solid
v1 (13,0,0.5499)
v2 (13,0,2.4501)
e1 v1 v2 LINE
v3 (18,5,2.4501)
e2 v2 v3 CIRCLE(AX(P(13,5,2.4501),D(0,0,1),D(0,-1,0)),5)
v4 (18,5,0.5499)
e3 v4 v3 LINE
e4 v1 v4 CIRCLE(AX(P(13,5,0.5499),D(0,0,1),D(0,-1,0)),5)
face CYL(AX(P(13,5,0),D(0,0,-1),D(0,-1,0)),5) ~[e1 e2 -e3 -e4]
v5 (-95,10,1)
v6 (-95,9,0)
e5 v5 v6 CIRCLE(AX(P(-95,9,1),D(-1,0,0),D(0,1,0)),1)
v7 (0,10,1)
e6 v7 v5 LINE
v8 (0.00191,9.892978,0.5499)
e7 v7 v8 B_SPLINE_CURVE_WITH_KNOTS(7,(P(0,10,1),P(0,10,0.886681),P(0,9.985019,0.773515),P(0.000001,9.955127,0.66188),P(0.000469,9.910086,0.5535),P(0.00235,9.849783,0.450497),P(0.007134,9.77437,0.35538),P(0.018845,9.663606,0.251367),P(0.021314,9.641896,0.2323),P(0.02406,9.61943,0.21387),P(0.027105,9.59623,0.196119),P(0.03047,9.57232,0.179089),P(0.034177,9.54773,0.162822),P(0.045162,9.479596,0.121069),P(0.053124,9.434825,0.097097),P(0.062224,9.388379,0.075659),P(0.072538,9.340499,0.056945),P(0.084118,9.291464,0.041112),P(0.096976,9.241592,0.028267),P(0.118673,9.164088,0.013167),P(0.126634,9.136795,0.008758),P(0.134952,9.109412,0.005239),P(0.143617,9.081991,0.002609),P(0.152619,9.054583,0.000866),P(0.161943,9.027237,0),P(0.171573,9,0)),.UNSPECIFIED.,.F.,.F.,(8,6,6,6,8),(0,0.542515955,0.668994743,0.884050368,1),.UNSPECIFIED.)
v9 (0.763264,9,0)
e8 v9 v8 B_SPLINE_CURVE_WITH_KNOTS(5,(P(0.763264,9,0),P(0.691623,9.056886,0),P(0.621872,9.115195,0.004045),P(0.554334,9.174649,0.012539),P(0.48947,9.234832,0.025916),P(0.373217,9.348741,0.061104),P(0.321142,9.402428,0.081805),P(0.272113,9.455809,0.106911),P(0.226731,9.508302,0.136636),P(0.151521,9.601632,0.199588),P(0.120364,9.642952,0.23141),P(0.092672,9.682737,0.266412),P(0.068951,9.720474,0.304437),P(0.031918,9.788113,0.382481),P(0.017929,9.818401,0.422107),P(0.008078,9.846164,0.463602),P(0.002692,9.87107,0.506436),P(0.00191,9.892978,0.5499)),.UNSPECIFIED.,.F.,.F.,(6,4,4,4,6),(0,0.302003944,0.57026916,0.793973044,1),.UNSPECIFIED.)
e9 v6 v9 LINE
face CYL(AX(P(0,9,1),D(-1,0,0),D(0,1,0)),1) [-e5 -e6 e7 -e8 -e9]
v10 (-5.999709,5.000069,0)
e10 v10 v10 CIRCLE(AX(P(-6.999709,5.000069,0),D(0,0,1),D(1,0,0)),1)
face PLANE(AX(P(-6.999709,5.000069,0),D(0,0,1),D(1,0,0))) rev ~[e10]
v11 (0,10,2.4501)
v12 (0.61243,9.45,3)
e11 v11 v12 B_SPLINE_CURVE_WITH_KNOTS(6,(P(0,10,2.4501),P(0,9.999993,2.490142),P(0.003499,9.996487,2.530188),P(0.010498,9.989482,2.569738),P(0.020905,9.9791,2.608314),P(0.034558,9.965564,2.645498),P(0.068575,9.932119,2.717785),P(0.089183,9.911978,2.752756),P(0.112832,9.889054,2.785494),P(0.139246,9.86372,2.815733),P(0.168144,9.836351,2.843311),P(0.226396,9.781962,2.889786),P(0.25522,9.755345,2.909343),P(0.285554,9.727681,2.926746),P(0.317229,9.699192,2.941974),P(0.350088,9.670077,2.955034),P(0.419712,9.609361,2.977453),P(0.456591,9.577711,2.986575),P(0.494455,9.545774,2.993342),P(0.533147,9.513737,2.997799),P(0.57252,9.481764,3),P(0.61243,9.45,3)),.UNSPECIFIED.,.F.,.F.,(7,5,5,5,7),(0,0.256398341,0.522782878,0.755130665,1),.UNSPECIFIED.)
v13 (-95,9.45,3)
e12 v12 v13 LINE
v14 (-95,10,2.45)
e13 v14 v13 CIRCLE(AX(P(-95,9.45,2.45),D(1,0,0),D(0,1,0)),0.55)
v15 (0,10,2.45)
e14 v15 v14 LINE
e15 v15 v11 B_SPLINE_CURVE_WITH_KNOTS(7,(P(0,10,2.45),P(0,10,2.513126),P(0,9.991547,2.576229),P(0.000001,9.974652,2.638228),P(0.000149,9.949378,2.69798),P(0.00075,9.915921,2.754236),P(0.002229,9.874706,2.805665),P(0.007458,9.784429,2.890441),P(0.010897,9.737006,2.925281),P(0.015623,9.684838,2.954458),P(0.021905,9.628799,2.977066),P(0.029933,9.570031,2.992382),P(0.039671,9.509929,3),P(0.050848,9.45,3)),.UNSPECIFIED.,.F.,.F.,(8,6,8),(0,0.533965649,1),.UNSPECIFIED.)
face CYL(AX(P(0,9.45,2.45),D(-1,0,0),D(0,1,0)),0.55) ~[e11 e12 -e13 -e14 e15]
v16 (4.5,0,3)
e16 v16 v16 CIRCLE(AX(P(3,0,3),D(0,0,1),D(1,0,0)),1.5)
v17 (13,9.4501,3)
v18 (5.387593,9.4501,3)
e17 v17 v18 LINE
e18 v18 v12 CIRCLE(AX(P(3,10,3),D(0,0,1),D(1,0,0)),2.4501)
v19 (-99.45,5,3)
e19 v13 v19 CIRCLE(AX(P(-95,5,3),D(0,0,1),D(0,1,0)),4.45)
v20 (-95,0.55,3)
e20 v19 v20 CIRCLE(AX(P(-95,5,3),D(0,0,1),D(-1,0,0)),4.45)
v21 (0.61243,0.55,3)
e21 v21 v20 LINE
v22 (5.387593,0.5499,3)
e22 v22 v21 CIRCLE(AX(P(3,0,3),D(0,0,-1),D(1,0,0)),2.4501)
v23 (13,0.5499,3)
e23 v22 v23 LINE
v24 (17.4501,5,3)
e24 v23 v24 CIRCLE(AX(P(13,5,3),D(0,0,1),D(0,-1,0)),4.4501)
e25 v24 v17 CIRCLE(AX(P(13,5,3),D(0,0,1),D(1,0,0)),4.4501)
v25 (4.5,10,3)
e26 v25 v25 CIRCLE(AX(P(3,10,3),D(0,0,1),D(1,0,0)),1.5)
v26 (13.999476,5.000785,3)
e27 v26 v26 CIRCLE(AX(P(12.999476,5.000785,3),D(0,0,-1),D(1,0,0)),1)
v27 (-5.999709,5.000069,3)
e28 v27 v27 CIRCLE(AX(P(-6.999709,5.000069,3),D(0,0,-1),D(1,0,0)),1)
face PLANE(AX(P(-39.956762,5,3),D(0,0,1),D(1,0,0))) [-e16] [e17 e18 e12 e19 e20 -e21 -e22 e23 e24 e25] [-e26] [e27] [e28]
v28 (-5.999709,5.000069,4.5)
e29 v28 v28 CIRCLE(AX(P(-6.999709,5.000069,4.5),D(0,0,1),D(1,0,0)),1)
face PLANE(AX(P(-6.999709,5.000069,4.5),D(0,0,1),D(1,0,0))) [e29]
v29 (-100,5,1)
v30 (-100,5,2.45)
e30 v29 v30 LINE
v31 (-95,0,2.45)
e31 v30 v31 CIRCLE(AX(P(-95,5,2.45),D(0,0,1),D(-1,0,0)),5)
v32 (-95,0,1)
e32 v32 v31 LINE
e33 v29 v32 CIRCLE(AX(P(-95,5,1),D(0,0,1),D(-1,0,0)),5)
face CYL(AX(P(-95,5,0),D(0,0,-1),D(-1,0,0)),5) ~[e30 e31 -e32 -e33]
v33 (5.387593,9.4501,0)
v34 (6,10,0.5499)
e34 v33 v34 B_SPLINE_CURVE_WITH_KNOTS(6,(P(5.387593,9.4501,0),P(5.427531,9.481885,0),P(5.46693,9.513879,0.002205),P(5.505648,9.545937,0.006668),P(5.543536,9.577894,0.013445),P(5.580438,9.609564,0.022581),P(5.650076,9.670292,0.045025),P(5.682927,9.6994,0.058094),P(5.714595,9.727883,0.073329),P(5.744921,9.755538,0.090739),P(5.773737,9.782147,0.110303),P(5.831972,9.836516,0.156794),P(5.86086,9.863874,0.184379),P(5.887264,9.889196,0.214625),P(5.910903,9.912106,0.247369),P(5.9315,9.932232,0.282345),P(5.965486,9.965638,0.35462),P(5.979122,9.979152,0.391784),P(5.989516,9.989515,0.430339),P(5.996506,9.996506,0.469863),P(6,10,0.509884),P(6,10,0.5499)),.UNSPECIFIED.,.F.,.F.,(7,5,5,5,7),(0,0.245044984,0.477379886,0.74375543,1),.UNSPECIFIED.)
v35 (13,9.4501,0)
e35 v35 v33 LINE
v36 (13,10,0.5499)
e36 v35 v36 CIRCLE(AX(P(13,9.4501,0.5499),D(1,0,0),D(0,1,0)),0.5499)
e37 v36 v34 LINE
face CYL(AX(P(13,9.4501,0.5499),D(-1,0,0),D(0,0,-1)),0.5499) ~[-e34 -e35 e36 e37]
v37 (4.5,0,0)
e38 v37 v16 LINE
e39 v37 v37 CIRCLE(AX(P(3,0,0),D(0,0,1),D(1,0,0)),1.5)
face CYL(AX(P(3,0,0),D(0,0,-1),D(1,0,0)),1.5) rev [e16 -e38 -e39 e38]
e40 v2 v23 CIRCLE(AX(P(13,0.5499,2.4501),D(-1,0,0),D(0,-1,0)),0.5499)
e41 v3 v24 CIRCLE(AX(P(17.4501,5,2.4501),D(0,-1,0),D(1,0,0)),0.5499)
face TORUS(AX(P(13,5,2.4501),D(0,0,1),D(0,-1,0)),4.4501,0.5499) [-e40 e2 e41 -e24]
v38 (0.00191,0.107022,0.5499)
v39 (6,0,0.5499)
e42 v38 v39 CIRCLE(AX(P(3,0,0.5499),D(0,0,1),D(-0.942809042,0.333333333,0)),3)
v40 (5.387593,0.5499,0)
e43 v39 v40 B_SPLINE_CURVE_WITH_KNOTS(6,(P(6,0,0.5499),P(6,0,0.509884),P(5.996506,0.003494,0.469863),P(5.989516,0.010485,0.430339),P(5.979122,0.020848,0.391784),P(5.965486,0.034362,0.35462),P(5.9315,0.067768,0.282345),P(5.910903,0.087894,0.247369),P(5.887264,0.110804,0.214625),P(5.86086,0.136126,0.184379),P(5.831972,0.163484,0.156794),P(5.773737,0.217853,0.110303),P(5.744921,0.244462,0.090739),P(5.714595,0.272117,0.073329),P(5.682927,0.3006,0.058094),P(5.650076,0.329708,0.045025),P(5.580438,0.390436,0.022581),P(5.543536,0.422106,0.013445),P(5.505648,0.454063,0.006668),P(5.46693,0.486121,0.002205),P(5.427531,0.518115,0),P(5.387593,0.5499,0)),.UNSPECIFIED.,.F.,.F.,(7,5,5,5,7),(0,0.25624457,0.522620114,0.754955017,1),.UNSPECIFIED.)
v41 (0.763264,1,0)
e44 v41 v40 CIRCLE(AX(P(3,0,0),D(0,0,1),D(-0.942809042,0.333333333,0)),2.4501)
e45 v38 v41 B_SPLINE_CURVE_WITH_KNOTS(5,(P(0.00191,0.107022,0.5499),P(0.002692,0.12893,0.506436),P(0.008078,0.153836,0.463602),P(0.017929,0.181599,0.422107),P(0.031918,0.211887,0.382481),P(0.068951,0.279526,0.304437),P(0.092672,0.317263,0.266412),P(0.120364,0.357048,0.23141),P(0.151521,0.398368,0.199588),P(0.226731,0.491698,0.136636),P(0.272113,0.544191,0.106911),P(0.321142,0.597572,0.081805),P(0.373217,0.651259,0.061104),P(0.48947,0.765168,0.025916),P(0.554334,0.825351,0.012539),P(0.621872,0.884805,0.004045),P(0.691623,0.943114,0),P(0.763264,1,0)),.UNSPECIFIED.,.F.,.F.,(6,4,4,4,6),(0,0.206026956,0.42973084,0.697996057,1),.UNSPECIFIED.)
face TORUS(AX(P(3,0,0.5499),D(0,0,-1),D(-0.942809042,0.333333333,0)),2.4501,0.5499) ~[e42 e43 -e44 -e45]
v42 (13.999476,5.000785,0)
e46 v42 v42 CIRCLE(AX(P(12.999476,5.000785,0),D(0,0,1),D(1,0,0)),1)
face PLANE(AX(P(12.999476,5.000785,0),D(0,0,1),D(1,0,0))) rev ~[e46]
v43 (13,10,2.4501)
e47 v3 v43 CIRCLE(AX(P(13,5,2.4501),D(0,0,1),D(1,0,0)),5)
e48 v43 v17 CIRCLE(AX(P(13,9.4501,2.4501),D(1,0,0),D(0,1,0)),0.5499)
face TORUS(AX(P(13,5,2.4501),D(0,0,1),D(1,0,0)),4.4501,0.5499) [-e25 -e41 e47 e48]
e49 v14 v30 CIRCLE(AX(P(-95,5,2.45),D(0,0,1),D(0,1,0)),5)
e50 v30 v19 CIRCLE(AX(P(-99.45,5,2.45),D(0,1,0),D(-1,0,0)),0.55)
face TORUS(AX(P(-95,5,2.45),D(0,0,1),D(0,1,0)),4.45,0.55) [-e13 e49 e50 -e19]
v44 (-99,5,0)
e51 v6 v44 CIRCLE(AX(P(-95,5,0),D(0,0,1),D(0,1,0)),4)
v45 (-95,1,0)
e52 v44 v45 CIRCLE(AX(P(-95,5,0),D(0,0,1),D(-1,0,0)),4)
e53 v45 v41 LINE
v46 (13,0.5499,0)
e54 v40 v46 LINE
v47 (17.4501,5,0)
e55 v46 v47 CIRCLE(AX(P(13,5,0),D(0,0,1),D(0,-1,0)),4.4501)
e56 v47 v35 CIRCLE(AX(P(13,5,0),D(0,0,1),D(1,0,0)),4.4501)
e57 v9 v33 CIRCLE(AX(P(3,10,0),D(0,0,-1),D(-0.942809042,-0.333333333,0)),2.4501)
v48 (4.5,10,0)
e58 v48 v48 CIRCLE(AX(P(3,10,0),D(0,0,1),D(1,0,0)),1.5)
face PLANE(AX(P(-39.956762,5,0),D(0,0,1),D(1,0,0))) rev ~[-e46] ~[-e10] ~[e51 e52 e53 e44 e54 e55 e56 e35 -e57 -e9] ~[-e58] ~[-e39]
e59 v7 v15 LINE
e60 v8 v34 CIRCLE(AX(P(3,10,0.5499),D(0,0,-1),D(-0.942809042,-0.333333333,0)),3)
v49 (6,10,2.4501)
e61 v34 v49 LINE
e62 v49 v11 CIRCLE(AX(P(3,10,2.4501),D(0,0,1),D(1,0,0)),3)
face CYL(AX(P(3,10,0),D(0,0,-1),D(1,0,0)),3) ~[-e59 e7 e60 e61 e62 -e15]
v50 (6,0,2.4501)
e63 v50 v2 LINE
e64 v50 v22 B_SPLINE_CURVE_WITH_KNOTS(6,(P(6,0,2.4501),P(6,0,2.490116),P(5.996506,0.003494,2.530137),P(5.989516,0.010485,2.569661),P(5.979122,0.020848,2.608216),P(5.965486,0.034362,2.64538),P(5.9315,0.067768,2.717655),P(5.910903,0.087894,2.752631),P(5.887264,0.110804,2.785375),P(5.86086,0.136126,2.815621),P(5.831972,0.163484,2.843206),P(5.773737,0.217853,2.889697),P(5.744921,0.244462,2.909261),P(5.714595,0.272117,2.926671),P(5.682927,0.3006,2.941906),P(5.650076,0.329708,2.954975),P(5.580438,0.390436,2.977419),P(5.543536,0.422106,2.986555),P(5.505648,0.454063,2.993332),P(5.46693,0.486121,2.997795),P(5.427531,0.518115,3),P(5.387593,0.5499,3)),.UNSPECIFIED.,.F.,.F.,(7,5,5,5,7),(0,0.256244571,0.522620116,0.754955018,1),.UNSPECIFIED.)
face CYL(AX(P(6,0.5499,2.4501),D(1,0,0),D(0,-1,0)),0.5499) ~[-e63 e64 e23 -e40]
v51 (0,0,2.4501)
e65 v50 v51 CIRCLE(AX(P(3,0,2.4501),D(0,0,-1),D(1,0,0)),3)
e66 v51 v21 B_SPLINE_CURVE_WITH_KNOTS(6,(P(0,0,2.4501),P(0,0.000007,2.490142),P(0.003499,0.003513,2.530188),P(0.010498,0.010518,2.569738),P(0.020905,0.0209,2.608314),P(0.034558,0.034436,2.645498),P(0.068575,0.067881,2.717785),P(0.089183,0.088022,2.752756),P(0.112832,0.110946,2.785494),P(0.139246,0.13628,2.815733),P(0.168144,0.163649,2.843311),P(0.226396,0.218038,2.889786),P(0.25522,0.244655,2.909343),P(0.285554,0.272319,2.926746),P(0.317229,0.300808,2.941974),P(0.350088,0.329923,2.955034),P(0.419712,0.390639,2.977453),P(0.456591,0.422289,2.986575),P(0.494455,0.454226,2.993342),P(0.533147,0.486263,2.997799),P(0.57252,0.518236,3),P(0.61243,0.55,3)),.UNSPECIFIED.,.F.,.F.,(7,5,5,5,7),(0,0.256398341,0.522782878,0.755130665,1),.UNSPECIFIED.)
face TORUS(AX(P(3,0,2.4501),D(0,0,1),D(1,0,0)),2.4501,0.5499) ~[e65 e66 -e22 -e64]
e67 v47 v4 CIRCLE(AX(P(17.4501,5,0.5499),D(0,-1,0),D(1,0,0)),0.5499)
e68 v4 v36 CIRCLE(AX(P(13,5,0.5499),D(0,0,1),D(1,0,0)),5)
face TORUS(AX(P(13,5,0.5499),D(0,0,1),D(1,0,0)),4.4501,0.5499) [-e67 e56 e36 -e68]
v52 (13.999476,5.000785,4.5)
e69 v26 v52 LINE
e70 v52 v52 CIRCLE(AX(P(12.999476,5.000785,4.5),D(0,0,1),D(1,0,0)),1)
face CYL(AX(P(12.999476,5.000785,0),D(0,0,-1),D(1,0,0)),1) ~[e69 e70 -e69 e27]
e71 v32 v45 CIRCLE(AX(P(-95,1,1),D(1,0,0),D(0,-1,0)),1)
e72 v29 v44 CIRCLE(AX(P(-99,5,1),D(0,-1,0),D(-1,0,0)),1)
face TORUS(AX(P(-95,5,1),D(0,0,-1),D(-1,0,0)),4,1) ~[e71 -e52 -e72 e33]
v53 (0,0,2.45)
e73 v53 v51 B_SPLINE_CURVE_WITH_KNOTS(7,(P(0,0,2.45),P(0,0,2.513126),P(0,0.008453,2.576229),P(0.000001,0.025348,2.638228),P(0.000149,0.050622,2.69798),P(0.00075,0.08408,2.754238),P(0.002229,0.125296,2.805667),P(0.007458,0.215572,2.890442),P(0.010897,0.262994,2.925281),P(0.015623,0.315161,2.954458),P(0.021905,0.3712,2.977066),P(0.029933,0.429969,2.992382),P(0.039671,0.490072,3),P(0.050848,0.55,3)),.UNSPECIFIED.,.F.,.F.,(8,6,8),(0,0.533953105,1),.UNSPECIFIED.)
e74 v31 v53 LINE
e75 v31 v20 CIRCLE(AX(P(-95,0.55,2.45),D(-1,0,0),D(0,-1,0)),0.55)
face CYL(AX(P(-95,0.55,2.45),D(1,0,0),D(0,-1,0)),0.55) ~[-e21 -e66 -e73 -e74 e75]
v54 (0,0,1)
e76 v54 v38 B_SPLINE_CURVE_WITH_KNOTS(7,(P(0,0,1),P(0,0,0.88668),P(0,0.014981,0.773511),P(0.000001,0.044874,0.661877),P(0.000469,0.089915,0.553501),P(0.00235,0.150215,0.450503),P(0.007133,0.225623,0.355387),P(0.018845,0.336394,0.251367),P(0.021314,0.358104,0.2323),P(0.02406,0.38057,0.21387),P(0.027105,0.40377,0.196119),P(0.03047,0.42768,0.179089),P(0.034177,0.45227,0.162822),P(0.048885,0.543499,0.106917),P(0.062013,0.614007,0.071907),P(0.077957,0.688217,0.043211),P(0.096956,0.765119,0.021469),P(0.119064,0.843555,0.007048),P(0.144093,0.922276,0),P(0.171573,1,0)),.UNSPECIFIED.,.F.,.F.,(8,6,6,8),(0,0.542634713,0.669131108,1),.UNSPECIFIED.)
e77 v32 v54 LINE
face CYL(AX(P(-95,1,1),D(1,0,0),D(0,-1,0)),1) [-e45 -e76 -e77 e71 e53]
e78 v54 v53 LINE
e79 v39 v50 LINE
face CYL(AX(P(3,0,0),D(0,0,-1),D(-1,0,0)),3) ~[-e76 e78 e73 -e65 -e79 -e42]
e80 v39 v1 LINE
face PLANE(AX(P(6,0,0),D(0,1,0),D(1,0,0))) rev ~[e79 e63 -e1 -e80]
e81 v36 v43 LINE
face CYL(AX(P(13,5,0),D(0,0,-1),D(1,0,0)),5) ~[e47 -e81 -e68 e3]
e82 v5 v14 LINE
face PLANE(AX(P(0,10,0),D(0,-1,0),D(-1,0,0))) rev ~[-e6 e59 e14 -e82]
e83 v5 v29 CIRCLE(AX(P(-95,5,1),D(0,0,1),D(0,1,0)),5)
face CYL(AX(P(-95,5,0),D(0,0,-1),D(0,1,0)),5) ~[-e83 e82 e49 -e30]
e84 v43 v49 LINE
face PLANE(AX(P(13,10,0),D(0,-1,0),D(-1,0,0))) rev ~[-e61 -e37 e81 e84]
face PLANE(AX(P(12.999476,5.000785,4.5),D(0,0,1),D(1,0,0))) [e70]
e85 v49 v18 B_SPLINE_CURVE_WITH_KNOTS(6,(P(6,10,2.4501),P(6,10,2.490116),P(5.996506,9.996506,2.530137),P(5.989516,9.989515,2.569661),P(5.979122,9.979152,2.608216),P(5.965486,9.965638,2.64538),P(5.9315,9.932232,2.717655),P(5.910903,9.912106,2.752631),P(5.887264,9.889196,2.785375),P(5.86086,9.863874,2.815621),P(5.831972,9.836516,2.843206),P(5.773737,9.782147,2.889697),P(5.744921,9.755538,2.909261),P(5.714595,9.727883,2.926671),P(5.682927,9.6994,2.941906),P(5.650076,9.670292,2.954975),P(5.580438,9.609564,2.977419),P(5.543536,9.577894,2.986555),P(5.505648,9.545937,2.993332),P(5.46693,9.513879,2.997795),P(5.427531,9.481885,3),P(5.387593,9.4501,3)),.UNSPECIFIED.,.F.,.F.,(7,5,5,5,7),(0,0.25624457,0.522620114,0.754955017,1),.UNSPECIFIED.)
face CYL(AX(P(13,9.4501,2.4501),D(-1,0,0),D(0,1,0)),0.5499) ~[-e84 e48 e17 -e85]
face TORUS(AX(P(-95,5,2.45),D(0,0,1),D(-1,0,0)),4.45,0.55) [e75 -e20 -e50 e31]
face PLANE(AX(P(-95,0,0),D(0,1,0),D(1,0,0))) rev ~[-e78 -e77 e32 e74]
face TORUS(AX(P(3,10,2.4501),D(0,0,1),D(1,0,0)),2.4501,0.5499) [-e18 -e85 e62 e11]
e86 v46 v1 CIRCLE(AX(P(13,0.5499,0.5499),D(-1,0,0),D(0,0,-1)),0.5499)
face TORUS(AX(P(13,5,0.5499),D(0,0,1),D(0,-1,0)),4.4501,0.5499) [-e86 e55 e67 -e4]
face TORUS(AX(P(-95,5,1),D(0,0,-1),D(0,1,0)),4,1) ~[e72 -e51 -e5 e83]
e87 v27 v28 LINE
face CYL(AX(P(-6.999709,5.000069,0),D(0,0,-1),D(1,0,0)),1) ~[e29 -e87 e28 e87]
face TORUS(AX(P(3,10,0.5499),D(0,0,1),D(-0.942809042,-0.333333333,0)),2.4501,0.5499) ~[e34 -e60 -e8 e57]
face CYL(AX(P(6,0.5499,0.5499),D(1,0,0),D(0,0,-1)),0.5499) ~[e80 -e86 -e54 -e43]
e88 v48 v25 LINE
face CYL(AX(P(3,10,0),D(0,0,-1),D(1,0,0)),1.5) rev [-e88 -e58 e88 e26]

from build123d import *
from build123d import SkipClean  # not in build123d's __all__

# Parameters (mm, degrees)
F0_R     = 1.5
F1_DEPTH = 3
F2_R     = 0.55
F3_R     = 1
F4_R     = 0.5499
F5_R     = 1
F6_DEPTH = 4.5


# Not quite as in the source:
# - a fillet or chamfer is up to 0.001 mm smaller than in the source, because OpenCascade refuses the exact size
# - a feature names something its author has since deleted; it is built from what else it names


with BuildPart() as f1:
    # F0 (on Top) → F1 (new body)
    with BuildSketch(Plane.XY):
        with BuildLine():
            Line((-95, 0), (0, 0))
            ThreePointArc((0, 0), (3, -3), (6, 0))
            Line((6, 0), (13, 0))
            ThreePointArc((13, 0), (16.5355339059, 1.4644660941), (18, 5))
            ThreePointArc((18, 5), (16.5355339059, 8.5355339059), (13, 10))
            Line((13, 10), (6, 10))
            ThreePointArc((6, 10), (3, 13), (0, 10))
            Line((0, 10), (-95, 10))
            ThreePointArc((-95, 10), (-98.5355339059, 8.5355339059), (-100, 5))
            ThreePointArc((-100, 5), (-98.5355339059, 1.4644660941), (-95, 0))
        make_face()
        with Locations((3, 0)):
            Circle(F0_R, mode=Mode.SUBTRACT)
        with Locations((3, 10)):
            Circle(F0_R, mode=Mode.SUBTRACT)
    extrude(amount=F1_DEPTH)

    # F2
    f2_edges = [f1.edges().sort_by_distance(p)[0] for p in [
        (-47.5, 0, 3),
    ]]
    fillet(f2_edges, radius=F2_R)

    # F3
    f3_edges = [f1.edges().sort_by_distance(p)[0] for p in [
        (-47.5, 0, 0),
    ]]
    fillet(f3_edges, radius=F3_R)

    # F4 (radius 0.55 in the source; OpenCascade refuses exactly that, so slightly less here)
    f4_edges = [f1.edges().sort_by_distance(p)[0] for p in [
        (3, -3, 3),
        (3, 13, 3),
        (3, -3, 0),
        (3, 13, 0),
        (9.5, 0, 3),
        (18, 5, 3),
        (18, 5, 0),
        (9.5, 0, 0),
        (9.5, 10, 0),
        (9.5, 10, 3),
    ]]
    fillet(f4_edges, radius=F4_R)

    # F5 (on Top) → F6 (join)
    with BuildSketch(Plane.XY):
        with Locations((12.9994759336, 5.0007845275)):
            Circle(F5_R)
        with Locations((-6.9997087121, 5.0000692718)):
            Circle(F5_R)
    with SkipClean():  # cleaning this boolean's faces spoils the solid; the shape is the same uncleaned
        extrude(amount=F6_DEPTH)


solid = f1.part
